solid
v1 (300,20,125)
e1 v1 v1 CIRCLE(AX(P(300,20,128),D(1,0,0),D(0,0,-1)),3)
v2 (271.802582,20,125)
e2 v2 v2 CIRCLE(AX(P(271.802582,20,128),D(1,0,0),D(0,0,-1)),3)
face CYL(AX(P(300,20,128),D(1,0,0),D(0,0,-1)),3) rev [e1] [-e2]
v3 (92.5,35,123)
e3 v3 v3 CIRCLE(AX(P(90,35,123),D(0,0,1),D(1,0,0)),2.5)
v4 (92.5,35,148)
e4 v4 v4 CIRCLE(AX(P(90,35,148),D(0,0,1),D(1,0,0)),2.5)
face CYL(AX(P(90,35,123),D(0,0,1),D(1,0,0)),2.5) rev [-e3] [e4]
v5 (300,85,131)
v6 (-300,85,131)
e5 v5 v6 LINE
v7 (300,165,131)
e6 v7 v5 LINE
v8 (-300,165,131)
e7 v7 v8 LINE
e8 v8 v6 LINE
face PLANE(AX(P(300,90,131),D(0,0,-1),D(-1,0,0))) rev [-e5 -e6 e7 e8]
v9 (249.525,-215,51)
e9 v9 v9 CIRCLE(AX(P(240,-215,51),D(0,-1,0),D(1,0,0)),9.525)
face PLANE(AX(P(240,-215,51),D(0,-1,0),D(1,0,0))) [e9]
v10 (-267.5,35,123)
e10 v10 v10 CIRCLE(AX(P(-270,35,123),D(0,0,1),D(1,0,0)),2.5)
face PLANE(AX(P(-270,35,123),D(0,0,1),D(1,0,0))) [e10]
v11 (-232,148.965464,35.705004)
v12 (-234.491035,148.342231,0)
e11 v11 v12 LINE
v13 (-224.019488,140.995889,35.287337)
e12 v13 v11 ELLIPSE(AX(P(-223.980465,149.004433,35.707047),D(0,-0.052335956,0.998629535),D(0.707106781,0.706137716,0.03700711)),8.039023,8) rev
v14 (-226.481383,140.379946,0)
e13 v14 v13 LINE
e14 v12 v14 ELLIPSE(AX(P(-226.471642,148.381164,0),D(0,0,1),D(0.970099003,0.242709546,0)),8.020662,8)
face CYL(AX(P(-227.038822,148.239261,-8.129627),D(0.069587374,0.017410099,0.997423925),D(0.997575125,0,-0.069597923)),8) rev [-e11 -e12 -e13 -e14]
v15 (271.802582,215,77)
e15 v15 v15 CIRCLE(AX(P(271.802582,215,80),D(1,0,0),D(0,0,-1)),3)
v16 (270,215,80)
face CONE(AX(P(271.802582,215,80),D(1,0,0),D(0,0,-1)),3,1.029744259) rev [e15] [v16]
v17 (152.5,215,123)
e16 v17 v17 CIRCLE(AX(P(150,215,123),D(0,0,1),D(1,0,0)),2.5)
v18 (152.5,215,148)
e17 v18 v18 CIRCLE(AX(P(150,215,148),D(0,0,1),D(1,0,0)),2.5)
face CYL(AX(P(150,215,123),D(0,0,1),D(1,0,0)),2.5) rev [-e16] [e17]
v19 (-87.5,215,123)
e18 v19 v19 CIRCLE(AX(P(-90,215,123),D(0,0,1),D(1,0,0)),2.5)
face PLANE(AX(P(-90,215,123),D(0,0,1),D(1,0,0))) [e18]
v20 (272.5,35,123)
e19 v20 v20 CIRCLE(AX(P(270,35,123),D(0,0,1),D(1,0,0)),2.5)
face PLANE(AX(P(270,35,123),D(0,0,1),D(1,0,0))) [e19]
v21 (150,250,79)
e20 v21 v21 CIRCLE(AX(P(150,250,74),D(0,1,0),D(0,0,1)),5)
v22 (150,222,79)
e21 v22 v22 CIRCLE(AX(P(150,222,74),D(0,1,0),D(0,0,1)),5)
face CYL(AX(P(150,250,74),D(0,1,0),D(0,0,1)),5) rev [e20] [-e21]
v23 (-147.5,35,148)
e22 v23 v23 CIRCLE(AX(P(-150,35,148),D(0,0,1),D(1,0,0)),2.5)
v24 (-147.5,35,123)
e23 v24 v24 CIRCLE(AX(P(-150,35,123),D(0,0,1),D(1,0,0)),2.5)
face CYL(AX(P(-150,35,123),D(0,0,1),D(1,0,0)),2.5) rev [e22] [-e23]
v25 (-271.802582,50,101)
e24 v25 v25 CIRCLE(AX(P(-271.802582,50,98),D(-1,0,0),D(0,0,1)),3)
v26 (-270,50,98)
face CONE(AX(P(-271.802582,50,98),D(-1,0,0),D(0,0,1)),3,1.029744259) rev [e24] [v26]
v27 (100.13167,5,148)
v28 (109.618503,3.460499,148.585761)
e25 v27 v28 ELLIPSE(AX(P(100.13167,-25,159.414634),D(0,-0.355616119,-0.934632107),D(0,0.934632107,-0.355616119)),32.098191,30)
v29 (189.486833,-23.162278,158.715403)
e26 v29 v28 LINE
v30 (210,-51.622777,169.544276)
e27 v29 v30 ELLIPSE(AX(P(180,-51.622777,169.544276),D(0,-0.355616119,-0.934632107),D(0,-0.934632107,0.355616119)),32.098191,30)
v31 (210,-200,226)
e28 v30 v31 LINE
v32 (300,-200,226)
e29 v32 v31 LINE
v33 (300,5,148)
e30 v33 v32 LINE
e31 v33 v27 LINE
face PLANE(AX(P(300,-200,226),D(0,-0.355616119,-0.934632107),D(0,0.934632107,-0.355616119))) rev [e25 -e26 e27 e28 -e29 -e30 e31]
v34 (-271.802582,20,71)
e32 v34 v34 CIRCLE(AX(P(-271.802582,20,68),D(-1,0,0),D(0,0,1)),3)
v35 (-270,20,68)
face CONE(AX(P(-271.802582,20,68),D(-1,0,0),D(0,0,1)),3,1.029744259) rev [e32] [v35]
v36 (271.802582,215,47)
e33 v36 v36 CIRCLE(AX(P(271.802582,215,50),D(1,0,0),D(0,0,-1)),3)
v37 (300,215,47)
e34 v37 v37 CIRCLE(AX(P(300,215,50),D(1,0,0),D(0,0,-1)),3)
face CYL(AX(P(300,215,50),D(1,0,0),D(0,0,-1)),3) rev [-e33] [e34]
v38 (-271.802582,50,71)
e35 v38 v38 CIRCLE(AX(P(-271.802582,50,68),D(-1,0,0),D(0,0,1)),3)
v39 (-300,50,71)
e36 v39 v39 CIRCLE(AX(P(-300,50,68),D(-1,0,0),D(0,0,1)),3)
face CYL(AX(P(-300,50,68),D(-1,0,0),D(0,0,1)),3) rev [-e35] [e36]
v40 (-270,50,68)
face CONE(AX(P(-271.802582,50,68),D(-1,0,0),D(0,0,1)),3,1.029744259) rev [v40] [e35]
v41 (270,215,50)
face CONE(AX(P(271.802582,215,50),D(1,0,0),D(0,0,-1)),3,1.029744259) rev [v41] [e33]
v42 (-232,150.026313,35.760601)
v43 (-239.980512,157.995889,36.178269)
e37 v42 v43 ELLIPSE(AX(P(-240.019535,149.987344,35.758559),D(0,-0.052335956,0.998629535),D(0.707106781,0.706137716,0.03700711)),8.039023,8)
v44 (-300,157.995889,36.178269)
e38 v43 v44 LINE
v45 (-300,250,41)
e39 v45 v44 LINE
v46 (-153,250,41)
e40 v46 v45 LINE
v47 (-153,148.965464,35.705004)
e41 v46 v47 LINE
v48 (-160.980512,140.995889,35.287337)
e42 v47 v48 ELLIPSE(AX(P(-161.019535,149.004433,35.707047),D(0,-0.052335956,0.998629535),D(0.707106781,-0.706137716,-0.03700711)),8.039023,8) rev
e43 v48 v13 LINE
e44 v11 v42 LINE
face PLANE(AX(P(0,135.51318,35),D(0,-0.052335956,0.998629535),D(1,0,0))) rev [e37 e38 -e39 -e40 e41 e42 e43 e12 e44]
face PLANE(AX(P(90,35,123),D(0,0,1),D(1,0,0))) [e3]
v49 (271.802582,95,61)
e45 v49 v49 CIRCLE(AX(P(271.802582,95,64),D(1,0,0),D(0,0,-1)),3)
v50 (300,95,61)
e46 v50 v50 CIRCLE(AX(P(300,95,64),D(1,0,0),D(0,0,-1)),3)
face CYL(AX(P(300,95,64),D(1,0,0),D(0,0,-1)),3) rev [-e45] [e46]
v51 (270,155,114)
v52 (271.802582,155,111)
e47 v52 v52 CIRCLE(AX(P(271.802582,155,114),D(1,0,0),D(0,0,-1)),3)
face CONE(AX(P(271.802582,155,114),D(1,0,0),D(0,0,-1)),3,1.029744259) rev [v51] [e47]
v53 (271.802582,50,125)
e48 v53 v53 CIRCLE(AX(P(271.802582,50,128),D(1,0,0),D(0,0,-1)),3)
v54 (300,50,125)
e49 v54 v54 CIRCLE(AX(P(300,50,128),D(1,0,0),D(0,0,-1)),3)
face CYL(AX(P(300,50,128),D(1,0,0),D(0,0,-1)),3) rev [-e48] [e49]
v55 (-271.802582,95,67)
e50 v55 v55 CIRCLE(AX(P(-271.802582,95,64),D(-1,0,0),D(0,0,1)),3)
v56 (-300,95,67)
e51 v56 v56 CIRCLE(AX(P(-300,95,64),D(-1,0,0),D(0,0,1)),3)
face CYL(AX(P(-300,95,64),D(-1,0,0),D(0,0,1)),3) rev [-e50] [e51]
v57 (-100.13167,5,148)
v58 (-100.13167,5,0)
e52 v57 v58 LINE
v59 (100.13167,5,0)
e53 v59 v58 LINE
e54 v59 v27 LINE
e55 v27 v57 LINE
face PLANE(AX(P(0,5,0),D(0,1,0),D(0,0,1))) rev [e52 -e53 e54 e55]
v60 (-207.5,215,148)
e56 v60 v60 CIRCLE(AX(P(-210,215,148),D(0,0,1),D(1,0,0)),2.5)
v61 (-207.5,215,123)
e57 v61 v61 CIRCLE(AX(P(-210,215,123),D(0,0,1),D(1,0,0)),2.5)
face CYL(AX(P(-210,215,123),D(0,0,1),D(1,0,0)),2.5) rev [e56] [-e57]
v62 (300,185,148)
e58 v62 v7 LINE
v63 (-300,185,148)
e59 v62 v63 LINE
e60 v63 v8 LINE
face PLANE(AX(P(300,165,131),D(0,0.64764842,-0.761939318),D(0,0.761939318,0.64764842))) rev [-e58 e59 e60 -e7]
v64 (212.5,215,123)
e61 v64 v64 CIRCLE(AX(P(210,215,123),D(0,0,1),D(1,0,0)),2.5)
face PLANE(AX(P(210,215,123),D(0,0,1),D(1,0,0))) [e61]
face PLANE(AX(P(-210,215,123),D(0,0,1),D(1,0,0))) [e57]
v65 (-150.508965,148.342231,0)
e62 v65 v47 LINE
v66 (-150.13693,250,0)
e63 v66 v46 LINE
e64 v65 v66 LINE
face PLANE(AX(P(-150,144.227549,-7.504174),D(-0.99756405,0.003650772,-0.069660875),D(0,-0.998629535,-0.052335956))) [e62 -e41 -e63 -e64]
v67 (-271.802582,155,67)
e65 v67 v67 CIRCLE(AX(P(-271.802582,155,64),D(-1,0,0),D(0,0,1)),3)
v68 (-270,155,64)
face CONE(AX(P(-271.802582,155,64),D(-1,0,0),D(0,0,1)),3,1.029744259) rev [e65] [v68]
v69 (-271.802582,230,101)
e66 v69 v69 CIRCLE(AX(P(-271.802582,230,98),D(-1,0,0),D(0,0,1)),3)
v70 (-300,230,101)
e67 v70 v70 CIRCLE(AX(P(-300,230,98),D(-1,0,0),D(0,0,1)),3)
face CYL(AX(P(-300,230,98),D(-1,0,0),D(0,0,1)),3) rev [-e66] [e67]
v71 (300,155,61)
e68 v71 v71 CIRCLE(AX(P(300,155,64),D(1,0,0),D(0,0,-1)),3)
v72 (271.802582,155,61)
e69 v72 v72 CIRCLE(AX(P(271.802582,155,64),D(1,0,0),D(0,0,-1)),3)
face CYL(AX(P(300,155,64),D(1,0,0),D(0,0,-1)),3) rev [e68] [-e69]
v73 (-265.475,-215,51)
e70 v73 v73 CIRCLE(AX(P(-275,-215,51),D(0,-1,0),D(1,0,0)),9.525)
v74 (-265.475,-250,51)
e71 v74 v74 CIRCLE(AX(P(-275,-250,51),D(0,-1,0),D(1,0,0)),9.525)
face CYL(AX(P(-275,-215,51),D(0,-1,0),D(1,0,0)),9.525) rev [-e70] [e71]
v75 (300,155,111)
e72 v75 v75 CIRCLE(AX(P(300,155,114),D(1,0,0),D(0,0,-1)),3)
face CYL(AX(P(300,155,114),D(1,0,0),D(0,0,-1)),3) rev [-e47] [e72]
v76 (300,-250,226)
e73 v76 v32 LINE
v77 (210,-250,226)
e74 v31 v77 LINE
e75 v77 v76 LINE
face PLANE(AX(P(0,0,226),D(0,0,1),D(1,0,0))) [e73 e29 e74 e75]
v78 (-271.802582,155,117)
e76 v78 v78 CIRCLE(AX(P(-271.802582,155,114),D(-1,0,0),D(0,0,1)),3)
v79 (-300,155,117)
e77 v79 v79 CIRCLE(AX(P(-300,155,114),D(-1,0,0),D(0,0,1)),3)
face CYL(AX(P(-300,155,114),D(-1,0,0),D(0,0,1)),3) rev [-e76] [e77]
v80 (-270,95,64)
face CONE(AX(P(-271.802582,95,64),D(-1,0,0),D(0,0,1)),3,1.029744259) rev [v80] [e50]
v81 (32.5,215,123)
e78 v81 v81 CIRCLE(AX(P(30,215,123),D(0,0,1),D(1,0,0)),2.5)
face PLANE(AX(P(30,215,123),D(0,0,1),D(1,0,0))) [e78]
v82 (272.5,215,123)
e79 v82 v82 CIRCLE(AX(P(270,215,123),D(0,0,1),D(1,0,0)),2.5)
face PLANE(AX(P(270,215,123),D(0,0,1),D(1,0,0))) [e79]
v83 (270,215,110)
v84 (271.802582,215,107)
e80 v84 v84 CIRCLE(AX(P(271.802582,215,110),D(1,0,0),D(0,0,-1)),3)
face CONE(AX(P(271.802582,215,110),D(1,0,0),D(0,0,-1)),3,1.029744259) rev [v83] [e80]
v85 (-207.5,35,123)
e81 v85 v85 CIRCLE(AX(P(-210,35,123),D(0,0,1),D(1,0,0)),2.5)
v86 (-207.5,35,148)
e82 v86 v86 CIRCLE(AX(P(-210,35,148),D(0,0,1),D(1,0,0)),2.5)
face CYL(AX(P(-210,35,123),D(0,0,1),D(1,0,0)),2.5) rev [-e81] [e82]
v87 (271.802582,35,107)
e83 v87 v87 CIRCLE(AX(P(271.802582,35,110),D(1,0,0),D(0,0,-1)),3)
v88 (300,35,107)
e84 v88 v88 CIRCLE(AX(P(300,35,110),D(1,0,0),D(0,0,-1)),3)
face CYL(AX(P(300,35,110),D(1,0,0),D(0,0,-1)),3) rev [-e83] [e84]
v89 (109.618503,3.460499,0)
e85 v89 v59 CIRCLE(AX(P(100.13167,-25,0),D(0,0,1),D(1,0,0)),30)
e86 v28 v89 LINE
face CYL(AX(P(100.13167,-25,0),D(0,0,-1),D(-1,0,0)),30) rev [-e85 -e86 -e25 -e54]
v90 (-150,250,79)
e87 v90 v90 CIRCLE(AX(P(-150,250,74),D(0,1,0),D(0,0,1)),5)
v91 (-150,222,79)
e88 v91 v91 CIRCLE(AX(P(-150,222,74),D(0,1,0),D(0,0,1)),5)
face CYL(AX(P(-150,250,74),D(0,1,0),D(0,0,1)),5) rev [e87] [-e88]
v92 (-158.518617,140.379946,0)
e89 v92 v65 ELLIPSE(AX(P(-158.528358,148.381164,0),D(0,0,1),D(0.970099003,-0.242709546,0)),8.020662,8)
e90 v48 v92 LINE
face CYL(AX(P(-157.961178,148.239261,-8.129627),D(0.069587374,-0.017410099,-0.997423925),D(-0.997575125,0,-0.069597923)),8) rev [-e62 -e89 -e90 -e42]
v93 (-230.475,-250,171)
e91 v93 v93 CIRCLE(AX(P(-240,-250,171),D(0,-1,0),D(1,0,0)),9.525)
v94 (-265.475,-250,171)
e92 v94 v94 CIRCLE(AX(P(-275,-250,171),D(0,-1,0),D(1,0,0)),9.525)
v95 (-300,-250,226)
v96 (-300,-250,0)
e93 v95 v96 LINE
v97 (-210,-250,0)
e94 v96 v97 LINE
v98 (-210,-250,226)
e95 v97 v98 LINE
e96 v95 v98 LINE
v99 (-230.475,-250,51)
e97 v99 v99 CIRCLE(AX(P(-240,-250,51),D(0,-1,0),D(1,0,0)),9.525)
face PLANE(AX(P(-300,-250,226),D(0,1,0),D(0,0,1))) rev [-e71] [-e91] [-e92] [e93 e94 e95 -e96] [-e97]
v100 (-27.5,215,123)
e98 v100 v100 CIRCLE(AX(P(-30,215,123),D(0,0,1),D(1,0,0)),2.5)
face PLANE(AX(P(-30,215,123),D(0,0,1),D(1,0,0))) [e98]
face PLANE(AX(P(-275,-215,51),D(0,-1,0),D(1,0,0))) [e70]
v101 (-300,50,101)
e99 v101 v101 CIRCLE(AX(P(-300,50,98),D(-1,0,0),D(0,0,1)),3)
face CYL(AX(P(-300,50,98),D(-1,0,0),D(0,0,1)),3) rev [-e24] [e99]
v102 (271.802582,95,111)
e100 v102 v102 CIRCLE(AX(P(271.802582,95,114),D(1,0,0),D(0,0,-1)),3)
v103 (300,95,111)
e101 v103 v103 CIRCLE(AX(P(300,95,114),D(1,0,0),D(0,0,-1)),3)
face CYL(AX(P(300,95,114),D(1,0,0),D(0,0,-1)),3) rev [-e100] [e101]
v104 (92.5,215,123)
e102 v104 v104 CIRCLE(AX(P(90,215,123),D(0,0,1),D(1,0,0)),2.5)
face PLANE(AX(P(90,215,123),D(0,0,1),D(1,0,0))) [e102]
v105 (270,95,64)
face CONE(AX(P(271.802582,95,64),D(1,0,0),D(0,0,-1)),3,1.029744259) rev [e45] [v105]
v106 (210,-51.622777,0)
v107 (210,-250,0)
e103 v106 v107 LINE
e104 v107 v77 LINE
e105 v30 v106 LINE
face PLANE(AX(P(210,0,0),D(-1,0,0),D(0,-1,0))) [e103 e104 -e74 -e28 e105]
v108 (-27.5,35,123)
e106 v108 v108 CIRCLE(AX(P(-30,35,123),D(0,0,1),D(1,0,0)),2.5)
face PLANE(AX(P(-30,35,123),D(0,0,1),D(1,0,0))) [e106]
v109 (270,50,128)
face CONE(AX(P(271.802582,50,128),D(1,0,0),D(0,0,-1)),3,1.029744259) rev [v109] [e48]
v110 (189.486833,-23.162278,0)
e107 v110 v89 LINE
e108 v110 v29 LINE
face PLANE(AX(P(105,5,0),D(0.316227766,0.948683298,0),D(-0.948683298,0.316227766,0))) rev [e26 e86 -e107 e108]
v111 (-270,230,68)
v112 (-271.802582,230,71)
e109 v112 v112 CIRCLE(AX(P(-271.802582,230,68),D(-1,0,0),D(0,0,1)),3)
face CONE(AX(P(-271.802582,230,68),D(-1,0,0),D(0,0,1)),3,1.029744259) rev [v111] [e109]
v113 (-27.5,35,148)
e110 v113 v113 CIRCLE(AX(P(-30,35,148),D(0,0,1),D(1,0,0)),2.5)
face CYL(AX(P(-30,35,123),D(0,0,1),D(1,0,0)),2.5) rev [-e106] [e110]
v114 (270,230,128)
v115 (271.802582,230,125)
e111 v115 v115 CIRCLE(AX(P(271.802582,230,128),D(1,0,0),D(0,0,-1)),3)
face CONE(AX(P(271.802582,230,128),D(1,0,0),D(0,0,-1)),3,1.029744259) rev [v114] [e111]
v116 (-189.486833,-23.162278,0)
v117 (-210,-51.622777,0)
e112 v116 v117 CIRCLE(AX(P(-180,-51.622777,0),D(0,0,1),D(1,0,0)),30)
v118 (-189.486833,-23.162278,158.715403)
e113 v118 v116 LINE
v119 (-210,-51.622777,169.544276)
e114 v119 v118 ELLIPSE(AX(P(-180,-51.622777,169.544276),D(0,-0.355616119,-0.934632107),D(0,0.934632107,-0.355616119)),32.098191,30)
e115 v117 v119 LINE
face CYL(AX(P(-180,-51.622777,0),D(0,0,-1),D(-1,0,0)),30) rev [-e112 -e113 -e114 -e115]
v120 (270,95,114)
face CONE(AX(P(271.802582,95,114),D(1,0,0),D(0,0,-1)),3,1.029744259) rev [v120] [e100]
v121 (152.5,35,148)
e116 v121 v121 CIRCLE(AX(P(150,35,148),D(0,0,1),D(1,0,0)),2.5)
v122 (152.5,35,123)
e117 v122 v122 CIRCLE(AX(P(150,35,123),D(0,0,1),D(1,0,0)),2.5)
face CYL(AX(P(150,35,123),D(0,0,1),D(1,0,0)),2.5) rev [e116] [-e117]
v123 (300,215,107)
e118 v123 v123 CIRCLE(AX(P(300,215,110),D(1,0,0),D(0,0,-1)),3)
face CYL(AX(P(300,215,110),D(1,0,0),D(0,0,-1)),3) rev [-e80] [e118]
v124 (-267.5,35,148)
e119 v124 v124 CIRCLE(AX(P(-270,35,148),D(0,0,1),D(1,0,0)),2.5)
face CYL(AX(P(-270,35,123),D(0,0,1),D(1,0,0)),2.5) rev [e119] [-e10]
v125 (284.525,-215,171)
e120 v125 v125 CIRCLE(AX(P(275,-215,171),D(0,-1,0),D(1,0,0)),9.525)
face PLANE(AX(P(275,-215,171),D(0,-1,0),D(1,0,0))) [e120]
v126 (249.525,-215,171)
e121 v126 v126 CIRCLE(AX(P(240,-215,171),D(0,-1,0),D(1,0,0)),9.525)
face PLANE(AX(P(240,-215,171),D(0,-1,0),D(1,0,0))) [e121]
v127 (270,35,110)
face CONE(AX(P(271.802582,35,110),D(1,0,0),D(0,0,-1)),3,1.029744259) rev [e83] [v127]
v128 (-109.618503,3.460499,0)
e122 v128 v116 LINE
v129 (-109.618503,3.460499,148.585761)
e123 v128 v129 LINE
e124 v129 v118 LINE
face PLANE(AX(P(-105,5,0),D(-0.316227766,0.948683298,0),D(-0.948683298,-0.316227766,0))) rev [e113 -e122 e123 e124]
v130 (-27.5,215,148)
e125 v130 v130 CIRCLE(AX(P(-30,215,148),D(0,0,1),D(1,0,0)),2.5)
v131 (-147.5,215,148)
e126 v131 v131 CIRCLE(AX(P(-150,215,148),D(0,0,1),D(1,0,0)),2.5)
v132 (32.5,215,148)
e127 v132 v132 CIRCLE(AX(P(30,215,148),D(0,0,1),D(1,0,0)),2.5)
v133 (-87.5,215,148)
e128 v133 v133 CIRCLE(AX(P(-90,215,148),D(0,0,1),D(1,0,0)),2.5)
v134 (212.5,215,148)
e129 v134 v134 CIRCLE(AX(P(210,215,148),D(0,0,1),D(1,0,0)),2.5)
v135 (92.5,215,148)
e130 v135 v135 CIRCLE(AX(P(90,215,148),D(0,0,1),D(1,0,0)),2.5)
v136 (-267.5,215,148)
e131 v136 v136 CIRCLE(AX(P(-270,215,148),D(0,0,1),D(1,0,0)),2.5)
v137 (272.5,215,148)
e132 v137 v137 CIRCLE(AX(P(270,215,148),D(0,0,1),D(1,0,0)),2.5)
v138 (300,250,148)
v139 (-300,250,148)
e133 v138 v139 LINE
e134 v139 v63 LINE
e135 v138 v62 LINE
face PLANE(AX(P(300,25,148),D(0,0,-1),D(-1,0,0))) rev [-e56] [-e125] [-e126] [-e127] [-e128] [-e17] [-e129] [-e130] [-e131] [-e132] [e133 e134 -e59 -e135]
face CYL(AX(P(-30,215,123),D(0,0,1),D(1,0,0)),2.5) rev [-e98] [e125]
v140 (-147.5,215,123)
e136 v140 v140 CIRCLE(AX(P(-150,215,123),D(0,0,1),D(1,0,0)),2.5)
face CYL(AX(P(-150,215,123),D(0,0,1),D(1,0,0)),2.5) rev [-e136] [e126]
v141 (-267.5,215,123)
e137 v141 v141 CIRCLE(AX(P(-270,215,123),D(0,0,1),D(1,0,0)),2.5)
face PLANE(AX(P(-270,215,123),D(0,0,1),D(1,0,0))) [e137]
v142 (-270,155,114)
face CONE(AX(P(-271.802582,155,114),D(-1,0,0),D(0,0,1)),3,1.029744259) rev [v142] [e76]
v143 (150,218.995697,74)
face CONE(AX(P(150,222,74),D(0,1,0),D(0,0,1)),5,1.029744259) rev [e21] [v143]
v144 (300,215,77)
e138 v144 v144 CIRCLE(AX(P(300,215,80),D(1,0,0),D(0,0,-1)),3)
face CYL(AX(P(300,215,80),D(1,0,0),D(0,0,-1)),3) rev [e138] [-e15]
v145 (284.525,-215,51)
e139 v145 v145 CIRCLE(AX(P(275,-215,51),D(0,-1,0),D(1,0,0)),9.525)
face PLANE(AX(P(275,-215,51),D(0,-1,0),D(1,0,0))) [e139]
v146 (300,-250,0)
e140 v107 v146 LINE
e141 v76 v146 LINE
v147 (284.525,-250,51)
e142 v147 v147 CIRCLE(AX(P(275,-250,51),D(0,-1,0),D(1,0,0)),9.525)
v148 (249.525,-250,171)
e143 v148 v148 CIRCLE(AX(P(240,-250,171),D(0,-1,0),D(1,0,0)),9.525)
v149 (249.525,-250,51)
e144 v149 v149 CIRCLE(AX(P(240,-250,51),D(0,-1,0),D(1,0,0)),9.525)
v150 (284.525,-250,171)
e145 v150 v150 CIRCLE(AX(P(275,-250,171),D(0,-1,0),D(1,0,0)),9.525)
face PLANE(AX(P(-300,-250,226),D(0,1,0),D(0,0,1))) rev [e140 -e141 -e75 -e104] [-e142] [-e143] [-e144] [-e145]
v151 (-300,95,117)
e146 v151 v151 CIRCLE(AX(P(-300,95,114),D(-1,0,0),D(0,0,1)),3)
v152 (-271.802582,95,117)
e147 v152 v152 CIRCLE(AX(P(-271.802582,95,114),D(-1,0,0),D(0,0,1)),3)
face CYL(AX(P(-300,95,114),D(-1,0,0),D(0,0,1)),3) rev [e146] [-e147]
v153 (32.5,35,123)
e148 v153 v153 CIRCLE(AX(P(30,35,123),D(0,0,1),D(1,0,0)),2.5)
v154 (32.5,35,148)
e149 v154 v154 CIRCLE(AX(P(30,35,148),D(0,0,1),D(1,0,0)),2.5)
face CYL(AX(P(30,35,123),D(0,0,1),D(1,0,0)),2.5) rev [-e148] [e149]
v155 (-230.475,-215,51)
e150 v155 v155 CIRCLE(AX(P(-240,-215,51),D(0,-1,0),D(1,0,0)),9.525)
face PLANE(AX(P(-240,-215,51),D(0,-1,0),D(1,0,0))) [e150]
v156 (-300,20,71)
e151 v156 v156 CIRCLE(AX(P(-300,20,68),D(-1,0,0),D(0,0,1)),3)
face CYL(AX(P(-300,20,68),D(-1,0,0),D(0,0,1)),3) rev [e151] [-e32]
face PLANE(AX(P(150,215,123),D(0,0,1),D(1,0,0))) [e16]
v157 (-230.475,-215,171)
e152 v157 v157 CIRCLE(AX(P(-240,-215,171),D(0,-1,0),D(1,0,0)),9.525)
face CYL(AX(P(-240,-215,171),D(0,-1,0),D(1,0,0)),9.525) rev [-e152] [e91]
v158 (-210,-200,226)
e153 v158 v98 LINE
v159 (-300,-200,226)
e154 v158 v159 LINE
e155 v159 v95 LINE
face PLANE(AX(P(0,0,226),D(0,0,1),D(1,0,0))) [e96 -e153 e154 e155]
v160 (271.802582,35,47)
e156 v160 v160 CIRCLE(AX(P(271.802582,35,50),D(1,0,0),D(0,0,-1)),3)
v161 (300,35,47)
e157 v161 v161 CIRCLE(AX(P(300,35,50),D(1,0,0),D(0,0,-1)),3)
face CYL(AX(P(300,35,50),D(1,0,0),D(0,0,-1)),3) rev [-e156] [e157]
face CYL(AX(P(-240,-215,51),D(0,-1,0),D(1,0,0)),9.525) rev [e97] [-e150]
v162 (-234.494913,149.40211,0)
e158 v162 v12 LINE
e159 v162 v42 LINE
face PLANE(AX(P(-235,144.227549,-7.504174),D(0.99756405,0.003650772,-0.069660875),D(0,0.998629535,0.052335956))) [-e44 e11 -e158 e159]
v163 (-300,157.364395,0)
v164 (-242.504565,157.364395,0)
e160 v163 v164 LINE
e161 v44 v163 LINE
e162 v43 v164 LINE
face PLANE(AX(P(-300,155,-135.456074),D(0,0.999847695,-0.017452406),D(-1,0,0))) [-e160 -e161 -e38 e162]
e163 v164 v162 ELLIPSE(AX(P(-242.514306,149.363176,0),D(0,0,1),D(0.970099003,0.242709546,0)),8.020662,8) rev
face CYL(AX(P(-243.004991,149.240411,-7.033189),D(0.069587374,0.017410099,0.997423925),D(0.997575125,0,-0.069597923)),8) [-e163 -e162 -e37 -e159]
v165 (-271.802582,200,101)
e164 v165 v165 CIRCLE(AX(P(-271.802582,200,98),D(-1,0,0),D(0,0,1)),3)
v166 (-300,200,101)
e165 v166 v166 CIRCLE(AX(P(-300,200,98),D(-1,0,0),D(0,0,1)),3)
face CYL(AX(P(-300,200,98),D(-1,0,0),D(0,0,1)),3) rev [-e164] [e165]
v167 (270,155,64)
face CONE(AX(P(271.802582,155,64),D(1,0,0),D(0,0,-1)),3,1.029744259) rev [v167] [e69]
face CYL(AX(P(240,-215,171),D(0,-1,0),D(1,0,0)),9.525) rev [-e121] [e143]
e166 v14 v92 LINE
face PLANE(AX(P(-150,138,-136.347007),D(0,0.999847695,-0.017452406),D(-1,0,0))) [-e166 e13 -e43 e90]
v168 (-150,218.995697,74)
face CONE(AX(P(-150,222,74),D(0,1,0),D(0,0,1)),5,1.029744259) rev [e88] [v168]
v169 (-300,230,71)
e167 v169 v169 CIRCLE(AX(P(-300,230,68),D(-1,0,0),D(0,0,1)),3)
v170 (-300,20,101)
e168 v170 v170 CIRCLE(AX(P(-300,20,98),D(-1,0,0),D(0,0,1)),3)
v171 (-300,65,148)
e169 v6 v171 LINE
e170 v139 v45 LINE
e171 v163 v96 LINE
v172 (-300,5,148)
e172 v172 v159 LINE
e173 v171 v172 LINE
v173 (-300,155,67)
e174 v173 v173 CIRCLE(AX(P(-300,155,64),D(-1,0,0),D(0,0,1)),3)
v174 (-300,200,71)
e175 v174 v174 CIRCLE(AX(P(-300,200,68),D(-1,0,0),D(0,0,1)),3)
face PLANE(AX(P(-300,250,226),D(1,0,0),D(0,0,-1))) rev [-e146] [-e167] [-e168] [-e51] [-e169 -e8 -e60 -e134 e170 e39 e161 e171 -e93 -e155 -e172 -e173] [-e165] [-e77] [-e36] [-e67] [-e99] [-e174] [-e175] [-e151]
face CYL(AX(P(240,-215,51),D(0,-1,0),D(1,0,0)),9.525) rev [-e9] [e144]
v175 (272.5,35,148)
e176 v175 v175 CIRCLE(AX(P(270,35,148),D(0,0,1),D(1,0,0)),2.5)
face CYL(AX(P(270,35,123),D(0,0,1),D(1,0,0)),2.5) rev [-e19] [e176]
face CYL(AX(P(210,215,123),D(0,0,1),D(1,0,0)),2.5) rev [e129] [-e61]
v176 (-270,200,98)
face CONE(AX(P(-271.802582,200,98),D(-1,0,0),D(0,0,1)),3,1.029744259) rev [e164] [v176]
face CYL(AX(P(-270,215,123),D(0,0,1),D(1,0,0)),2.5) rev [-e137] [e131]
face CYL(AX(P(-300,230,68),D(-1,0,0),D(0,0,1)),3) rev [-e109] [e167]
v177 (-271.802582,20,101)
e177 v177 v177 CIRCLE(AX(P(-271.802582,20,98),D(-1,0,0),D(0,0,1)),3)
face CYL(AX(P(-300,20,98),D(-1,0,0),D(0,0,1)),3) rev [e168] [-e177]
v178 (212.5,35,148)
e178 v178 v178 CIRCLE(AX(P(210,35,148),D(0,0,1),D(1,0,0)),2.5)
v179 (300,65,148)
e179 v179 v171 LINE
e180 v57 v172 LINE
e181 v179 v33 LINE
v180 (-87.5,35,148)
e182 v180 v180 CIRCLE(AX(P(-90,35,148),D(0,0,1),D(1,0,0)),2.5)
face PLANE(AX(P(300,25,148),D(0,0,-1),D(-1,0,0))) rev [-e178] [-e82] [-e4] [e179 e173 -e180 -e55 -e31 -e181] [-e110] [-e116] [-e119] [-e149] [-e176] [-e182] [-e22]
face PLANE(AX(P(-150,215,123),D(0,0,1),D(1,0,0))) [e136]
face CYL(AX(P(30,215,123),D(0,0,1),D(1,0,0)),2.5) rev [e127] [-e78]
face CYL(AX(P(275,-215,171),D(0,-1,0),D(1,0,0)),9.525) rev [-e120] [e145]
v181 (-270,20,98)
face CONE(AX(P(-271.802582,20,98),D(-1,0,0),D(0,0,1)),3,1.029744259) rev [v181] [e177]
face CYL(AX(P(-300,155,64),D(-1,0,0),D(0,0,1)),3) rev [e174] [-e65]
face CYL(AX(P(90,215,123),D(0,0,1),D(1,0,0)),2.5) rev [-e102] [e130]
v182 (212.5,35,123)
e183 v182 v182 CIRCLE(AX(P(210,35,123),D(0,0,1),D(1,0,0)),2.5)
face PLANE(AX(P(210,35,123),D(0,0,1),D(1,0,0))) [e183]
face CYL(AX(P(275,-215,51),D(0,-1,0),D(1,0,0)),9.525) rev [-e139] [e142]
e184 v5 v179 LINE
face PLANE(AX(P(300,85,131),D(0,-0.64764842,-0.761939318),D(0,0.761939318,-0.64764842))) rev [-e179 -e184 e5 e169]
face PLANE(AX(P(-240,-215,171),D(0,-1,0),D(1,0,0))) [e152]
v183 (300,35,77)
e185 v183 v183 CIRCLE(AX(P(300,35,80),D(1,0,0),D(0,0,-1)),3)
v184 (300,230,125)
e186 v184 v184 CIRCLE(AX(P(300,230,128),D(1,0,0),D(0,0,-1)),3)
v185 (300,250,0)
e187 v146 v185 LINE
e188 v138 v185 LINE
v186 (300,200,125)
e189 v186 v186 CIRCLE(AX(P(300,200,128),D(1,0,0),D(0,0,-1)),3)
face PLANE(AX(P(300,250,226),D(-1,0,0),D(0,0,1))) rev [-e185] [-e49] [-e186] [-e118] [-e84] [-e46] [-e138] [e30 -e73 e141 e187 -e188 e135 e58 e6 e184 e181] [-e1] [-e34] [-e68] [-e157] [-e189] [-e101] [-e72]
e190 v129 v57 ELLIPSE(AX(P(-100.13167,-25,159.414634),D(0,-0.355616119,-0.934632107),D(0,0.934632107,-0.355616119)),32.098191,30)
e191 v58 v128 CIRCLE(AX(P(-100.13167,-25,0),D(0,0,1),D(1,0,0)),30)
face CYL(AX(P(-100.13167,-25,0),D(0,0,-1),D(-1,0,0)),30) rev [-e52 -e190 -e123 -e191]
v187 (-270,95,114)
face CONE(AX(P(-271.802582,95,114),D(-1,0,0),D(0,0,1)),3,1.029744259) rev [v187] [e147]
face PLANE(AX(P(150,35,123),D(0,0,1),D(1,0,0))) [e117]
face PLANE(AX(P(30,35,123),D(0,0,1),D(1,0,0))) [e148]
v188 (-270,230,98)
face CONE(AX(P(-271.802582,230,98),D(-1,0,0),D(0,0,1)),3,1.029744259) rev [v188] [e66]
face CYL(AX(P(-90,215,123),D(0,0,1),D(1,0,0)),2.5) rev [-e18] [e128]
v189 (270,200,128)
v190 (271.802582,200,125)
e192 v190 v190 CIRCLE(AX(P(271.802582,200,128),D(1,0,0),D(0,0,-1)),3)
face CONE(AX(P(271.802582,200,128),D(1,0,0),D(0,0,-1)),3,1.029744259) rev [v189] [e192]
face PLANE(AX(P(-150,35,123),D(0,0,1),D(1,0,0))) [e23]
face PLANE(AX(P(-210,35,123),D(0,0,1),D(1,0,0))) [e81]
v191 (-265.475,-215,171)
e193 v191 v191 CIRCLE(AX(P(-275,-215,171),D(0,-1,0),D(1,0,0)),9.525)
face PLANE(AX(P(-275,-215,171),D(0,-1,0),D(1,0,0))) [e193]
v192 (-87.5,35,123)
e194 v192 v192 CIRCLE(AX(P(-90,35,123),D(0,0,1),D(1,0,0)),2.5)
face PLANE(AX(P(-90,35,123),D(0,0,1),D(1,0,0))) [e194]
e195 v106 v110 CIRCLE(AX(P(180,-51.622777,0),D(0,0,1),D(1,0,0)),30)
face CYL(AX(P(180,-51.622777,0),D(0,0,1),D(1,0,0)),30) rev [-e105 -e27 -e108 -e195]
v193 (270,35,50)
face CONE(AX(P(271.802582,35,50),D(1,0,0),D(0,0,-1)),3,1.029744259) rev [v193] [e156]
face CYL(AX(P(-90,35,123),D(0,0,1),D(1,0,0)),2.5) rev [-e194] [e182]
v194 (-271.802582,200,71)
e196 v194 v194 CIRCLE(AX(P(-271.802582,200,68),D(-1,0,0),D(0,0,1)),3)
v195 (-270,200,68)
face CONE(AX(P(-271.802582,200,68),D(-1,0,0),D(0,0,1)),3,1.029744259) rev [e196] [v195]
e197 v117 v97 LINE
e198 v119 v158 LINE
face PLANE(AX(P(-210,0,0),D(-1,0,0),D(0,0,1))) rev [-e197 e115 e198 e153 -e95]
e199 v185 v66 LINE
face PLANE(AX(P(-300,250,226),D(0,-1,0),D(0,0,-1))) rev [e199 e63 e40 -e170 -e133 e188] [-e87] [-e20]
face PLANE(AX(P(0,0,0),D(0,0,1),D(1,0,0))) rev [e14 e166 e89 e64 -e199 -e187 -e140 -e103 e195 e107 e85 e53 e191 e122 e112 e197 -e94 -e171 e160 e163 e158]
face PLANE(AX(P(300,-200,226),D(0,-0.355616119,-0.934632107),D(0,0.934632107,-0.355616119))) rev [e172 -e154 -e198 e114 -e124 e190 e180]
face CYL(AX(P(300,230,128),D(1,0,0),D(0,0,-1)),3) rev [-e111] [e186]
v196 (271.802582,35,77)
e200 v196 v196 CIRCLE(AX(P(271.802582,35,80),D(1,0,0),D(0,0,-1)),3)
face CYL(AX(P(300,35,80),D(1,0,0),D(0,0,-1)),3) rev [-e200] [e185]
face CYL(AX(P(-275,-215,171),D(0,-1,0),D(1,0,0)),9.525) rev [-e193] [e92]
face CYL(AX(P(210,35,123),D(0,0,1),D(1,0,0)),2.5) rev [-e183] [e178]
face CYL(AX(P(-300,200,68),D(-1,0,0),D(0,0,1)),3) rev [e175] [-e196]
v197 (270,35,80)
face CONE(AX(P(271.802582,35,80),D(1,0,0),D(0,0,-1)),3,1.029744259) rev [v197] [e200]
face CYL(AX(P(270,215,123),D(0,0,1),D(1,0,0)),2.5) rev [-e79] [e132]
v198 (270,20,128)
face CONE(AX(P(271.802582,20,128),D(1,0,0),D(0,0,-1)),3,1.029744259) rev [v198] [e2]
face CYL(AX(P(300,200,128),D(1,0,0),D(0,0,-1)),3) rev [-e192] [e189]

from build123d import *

# Parameters (mm, degrees)
SKETCH1_W                  = 600
SKETCH1_H                  = 500
BOSS_EXTRUDE1_DEPTH        = 226
SKETCH2_OUTSIDE_W          = 764.614
SKETCH2_OUTSIDE_H          = 664.614
CUT_EXTRUDE1_DEPTH         = 452.193971591
CUT_EXTRUDE8_DEPTH         = 452.193971591
CUT_EXTRUDE2_DEPTH         = 689.168583997
CUT_EXTRUDE3_DEPTH         = 689.168583997
SKETCH7_R                  = 2.5
CUT_EXTRUDE5_DEPTH         = 25
SKETCH8_R                  = 9.525
CUT_EXTRUDE6_DEPTH         = 35
F_6_0MM_DOWEL_HOLE1_D      = 6
F_6_0MM_DOWEL_HOLE1_DEPTH  = 28.197418143
F_6_0MM_DOWEL_HOLE1_TIP    = 1.802581857
F_6_0MM_DOWEL_HOLE2_D      = 6
F_6_0MM_DOWEL_HOLE2_DEPTH  = 28.197418143
F_6_0MM_DOWEL_HOLE2_TIP    = 1.802581857
F_6_0MM_DOWEL_HOLE3_D      = 6
F_6_0MM_DOWEL_HOLE3_DEPTH  = 28.197418143
F_6_0MM_DOWEL_HOLE3_TIP    = 1.802581857
FILLET2_R                  = 30
F_10_0MM_DOWEL_HOLE1_D     = 10
F_10_0MM_DOWEL_HOLE1_DEPTH = 28
F_10_0MM_DOWEL_HOLE1_TIP   = 3.004303095
CUT_EXTRUDE9_DEPTH         = 35
CHAMFER1_SIZE              = 6
CHAMFER1_SIZE_2            = 114.486820126
CHAMFER2_SIZE              = 3
CHAMFER2_SIZE_2            = 171.477335318
CHAMFER2_SIZE_3            = 42.90199877
CHAMFER3_SIZE              = 3
CHAMFER3_SIZE_2            = 171.477335318
CHAMFER3_SIZE_3            = 42.90199877
FILLET3_R                  = 8


with BuildPart() as part:
    # Sketch1 → Boss-Extrude1 (new body)
    with BuildSketch(Plane.XY):
        Rectangle(SKETCH1_W, SKETCH1_H)
    extrude(amount=BOSS_EXTRUDE1_DEPTH)

    # Sketch2 outside → Cut-Extrude1 (cut, through all)
    with BuildSketch(Plane.XY.offset(226)):
        Rectangle(SKETCH2_OUTSIDE_W, SKETCH2_OUTSIDE_H)
        Polygon((-210, -250), (-210, -225), (-210, -30), (210, -30), (210, -225), (210, -250), (300, -250), (300, 250), (-300, 250), (-300, -250), align=None, mode=Mode.SUBTRACT)
    extrude(amount=-CUT_EXTRUDE1_DEPTH, mode=Mode.SUBTRACT)

    # Sketch22 → Cut-Extrude8 (cut, through all)
    with BuildSketch(Plane.XY.offset(226)):
        Polygon((-210, -30), (210, -30), (105, 5), (0, 5), (-105, 5), align=None)
    extrude(amount=-CUT_EXTRUDE8_DEPTH, mode=Mode.SUBTRACT)

    # Sketch4 → Cut-Extrude2 (cut, through all)
    with BuildSketch(Plane.ZY.offset(300)):
        Polygon((148, 25), (148, 5), (226, -200), (226, -165), (226, -145), (226, 250), (148, 250), align=None)
    extrude(amount=-CUT_EXTRUDE2_DEPTH, mode=Mode.SUBTRACT)

    # Sketch5 → Cut-Extrude3 (cut, through all)
    with BuildSketch(Plane.ZY.offset(300)):
        Polygon((131, 160), (131, 165), (148, 185), (148, 65), (131, 85), (131, 90), (131, 125), align=None)
    extrude(amount=-CUT_EXTRUDE3_DEPTH, mode=Mode.SUBTRACT)

    # Sketch7 → Cut-Extrude5 (cut)
    with BuildSketch(Plane.XY.offset(148)):
        with Locations((-270, 215)):
            Circle(SKETCH7_R)
        with Locations((-210, 215)):
            Circle(SKETCH7_R)
        with Locations((-150, 215)):
            Circle(SKETCH7_R)
        with Locations((-90, 215)):
            Circle(SKETCH7_R)
        with Locations((-30, 215)):
            Circle(SKETCH7_R)
        with Locations((30, 215)):
            Circle(SKETCH7_R)
        with Locations((90, 215)):
            Circle(SKETCH7_R)
        with Locations((150, 215)):
            Circle(SKETCH7_R)
        with Locations((210, 215)):
            Circle(SKETCH7_R)
        with Locations((270, 215)):
            Circle(SKETCH7_R)
        with Locations((-210, 35)):
            Circle(SKETCH7_R)
        with Locations((-150, 35)):
            Circle(SKETCH7_R)
        with Locations((-90, 35)):
            Circle(SKETCH7_R)
        with Locations((-30, 35)):
            Circle(SKETCH7_R)
        with Locations((30, 35)):
            Circle(SKETCH7_R)
        with Locations((90, 35)):
            Circle(SKETCH7_R)
        with Locations((150, 35)):
            Circle(SKETCH7_R)
        with Locations((210, 35)):
            Circle(SKETCH7_R)
        with Locations((270, 35)):
            Circle(SKETCH7_R)
        with Locations((-270, 35)):
            Circle(SKETCH7_R)
    extrude(amount=-CUT_EXTRUDE5_DEPTH, mode=Mode.SUBTRACT)

    # Sketch8 → Cut-Extrude6 (cut)
    with BuildSketch(Plane.XZ.offset(250)):
        with Locations((240, 171)):
            Circle(SKETCH8_R)
        with Locations((275, 171)):
            Circle(SKETCH8_R)
        with Locations((240, 51)):
            Circle(SKETCH8_R)
        with Locations((275, 51)):
            Circle(SKETCH8_R)
        with Locations((-275, 51)):
            Circle(SKETCH8_R)
        with Locations((-240, 51)):
            Circle(SKETCH8_R)
        with Locations((-275, 171)):
            Circle(SKETCH8_R)
        with Locations((-240, 171)):
            Circle(SKETCH8_R)
    extrude(amount=-CUT_EXTRUDE6_DEPTH, mode=Mode.SUBTRACT)

    # Ø6.0mm Dowel Hole1
    with Locations(Plane.ZY.offset(300)):
        with Locations((114, 95), (64, 95), (64, 155), (114, 155), (98, 230), (98, 200), (98, 50), (98, 20), (68, 230), (68, 200), (68, 50), (68, 20)):
            Hole(F_6_0MM_DOWEL_HOLE1_D / 2, depth=F_6_0MM_DOWEL_HOLE1_DEPTH)
            with Locations((0, 0, -(F_6_0MM_DOWEL_HOLE1_DEPTH + F_6_0MM_DOWEL_HOLE1_TIP / 2))):  # 118° drill point
                Cone(0, F_6_0MM_DOWEL_HOLE1_D / 2, F_6_0MM_DOWEL_HOLE1_TIP, mode=Mode.SUBTRACT)

    # Ø6.0mm Dowel Hole2
    with Locations(Plane(origin=(300, 0, 0), x_dir=(0, 0, -1), z_dir=(1, 0, 0))):
        with Locations((-128, 230), (-128, 200), (-114, 155), (-64, 155), (-64, 95), (-114, 95), (-128, 50), (-128, 20)):
            Hole(F_6_0MM_DOWEL_HOLE2_D / 2, depth=F_6_0MM_DOWEL_HOLE2_DEPTH)
            with Locations((0, 0, -(F_6_0MM_DOWEL_HOLE2_DEPTH + F_6_0MM_DOWEL_HOLE2_TIP / 2))):  # 118° drill point
                Cone(0, F_6_0MM_DOWEL_HOLE2_D / 2, F_6_0MM_DOWEL_HOLE2_TIP, mode=Mode.SUBTRACT)

    # Ø6.0mm Dowel Hole3
    with Locations(Plane(origin=(300, 0, 0), x_dir=(0, 0, -1), z_dir=(1, 0, 0))):
        with Locations((-110, 215), (-80, 215), (-50, 215), (-50, 35), (-80, 35), (-110, 35)):
            Hole(F_6_0MM_DOWEL_HOLE3_D / 2, depth=F_6_0MM_DOWEL_HOLE3_DEPTH)
            with Locations((0, 0, -(F_6_0MM_DOWEL_HOLE3_DEPTH + F_6_0MM_DOWEL_HOLE3_TIP / 2))):  # 118° drill point
                Cone(0, F_6_0MM_DOWEL_HOLE3_D / 2, F_6_0MM_DOWEL_HOLE3_TIP, mode=Mode.SUBTRACT)

    # Fillet2
    fillet2_edges = [part.edges().sort_by_distance(p)[0] for p in [
        (210, -30, 80.658536585),
        (-210, -30, 80.658536585),
        (-105, 5, 74),
        (105, 5, 74),
    ]]
    fillet(fillet2_edges, radius=FILLET2_R)

    # Ø10.0mm Dowel Hole1
    with Locations(Plane(origin=(0, 250, 0), x_dir=(1, 0, 0), z_dir=(0, 1, 0))):
        with Locations((-150, -74), (150, -74)):
            Hole(F_10_0MM_DOWEL_HOLE1_D / 2, depth=F_10_0MM_DOWEL_HOLE1_DEPTH)
            with Locations((0, 0, -(F_10_0MM_DOWEL_HOLE1_DEPTH + F_10_0MM_DOWEL_HOLE1_TIP / 2))):  # 118° drill point
                Cone(0, F_10_0MM_DOWEL_HOLE1_D / 2, F_10_0MM_DOWEL_HOLE1_TIP, mode=Mode.SUBTRACT)

    # Sketch10 → Cut-Extrude9 (cut)
    with BuildSketch(Plane(origin=(0, 0, 0), x_dir=(-1, 0, 0), z_dir=(0, 0, -1))):
        Polygon((150, 142), (150, 138), (235, 138), (235, 142), (235, 155), (300, 155), (300, 250), (150, 250), (150, 155), align=None)
    extrude(amount=-CUT_EXTRUDE9_DEPTH, mode=Mode.SUBTRACT)

    # Chamfer1
    # the kernel refuses this chamfer: 114.486820126, 6 mm, written as the material it takes off along each edge
    with BuildSketch(Plane(origin=(-597.650645388, 250, 35), x_dir=(0, 0.5911482838883376, 0.8065628967761121), z_dir=(1, 0, 0))) as chamfer1_piece_1_section:
        Polygon((CHAMFER1_SIZE * 0.806562896776, CHAMFER1_SIZE * 0.591148283888), (-CHAMFER1_SIZE_2 * 0.59114828389, CHAMFER1_SIZE_2 * 0.806562896779), (0, 0), align=None)
    chamfer1_piece_1 = extrude(amount=447.650645388, mode=Mode.PRIVATE)
    chamfer1_piece_1 = split(chamfer1_piece_1, bisect_by=Plane(origin=(-267.5, 155, 37.049515036), z_dir=(0, 1, 0)), keep=Keep.TOP, mode=Mode.PRIVATE)
    add(chamfer1_piece_1, mode=Mode.SUBTRACT)
    with BuildSketch(Plane(origin=(-597.650645388, 250, 35), x_dir=(0, 0.5911482838883376, 0.8065628967761121), z_dir=(1, 0, 0))) as chamfer1_piece_2_section:
        Polygon((CHAMFER1_SIZE * 0.806562896776, CHAMFER1_SIZE * 0.591148283888), (-CHAMFER1_SIZE_2 * 0.59114828389, CHAMFER1_SIZE_2 * 0.806562896779), (0, 0), align=None)
    chamfer1_piece_2 = extrude(amount=447.650645388, mode=Mode.PRIVATE)
    chamfer1_piece_2 = split(chamfer1_piece_2, bisect_by=Plane(origin=(-192.5, 138, 35.345336882), z_dir=(0, 1, 0)), keep=Keep.TOP, mode=Mode.PRIVATE)
    chamfer1_piece_2 = split(chamfer1_piece_2, bisect_by=Plane(origin=(-235, 148.692020353, 35.345336882), z_dir=(1, 0, 0)), keep=Keep.TOP, mode=Mode.PRIVATE)
    add(chamfer1_piece_2, mode=Mode.SUBTRACT)

    # Chamfer2
    # the kernel refuses this chamfer: 171.477335318, 42.90199877, 3 mm, written as the material it adds along each edge
    with BuildSketch(Plane(origin=(-300, 155, 36.021260968), x_dir=(0, 0.4058983906880882, 0.9139182110215444), z_dir=(1, 0, 0))) as chamfer2_piece_1_section:
        Polygon((CHAMFER2_SIZE * 0.453172904552, -CHAMFER2_SIZE * 0.891422637462), (-CHAMFER2_SIZE_2 * 0.913918211021, -CHAMFER2_SIZE_2 * 0.405898390688), (0, 0), align=None)
    chamfer2_piece_1 = extrude(amount=65, mode=Mode.PRIVATE)
    chamfer2_piece_1 = split(chamfer2_piece_1, bisect_by=Plane(origin=(-267.5, 156.347115751, 0), z_dir=(0, 0, 1)), keep=Keep.TOP, mode=Mode.PRIVATE)
    add(chamfer2_piece_1)
    # the kernel refuses this chamfer: 171.477335318, 42.90199877, 3 mm, written as the material it adds along each edge
    with BuildSketch(Plane(origin=(-235, 269.37818115, 42.015567441), x_dir=(0.8766829747338777, -0.025177183236006113, 0.4804092747398407), z_dir=(-1.4194297151346516e-15, -0.9986295347545833, -0.0523359562427643))) as chamfer2_2_piece_1_section:
        Polygon((CHAMFER2_SIZE * 0.876682974734, -CHAMFER2_SIZE * 0.481068562485), (-CHAMFER2_SIZE_3 * 0.481068562487, -CHAMFER2_SIZE_3 * 0.876682974737), (0, 0), align=None)
    chamfer2_2_piece_1 = extrude(amount=243.09362506, mode=Mode.PRIVATE)
    chamfer2_2_piece_1 = split(chamfer2_2_piece_1, bisect_by=Plane(origin=(-233.972430934, 147.892877169, 0), z_dir=(0, 0, 1)), keep=Keep.TOP, mode=Mode.PRIVATE)
    chamfer2_2_piece_1 = split(chamfer2_2_piece_1, bisect_by=Plane(origin=(-233.972430934, 157.747464866, 21.946082382), z_dir=(0, -0.9998476951563882, 0.017452406437459534)), keep=Keep.TOP, mode=Mode.PRIVATE)
    add(chamfer2_2_piece_1)

    # Chamfer3
    # the kernel refuses this chamfer: 171.477335318, 42.90199877, 3 mm, written as the material it adds along each edge
    with BuildSketch(Plane(origin=(-677.838560586, 138, 35.13032872), x_dir=(0, 0.4058983906880882, 0.9139182110215444), z_dir=(1, 0, 0))) as chamfer3_piece_1_section:
        Polygon((CHAMFER3_SIZE * 0.453172904552, -CHAMFER3_SIZE * 0.891422637462), (-CHAMFER3_SIZE_2 * 0.913918211021, -CHAMFER3_SIZE_2 * 0.405898390688), (0, 0), align=None)
    chamfer3_piece_1 = extrude(amount=973.677121172, mode=Mode.PRIVATE)
    chamfer3_piece_1 = split(chamfer3_piece_1, bisect_by=Plane(origin=(-300, 139.34996863, 18.189156811), z_dir=(1, 0, 0)), keep=Keep.TOP, mode=Mode.PRIVATE)
    chamfer3_piece_1 = split(chamfer3_piece_1, bisect_by=Plane(origin=(-191.593979547, 139.34996863, 0), z_dir=(0, 0, 1)), keep=Keep.TOP, mode=Mode.PRIVATE)
    add(chamfer3_piece_1)
    # the kernel refuses this chamfer: 171.477335318, 42.90199877, 3 mm, written as the material it adds along each edge
    with BuildSketch(Plane(origin=(-150, 29.613596059, 29.450037985), x_dir=(-0.8766829747338778, -0.025177183236005013, 0.4804092747398405), z_dir=(0, 0.9986295347545833, 0.052335956242764624))) as chamfer3_2_piece_1_section:
        Polygon((CHAMFER3_SIZE * 0.876682974734, -CHAMFER3_SIZE * 0.481068562485), (-CHAMFER3_SIZE_3 * 0.481068562487, -CHAMFER3_SIZE_3 * 0.876682974737), (0, 0), align=None)
    chamfer3_2_piece_1 = extrude(amount=332.223997929, mode=Mode.PRIVATE)
    chamfer3_2_piece_1 = split(chamfer3_2_piece_1, bisect_by=Plane(origin=(-151.011869229, 250, 24.17159315), z_dir=(0, -1, 0)), keep=Keep.TOP, mode=Mode.PRIVATE)
    chamfer3_2_piece_1 = split(chamfer3_2_piece_1, bisect_by=Plane(origin=(-151.011869229, 195.655839269, 0), z_dir=(0, 0, 1)), keep=Keep.TOP, mode=Mode.PRIVATE)
    add(chamfer3_2_piece_1)

    # Fillet3
    fillet3_edges = [part.edges().sort_by_distance(p)[0] for p in [
        (-233.262026443, 157.680141588, 18.089134418),
        (-233.230947563, 140.687917229, 17.643668295),
        (-151.769052437, 140.687917229, 17.643668295),
    ]]
    fillet(fillet3_edges, radius=FILLET3_R)


solid = part.part
